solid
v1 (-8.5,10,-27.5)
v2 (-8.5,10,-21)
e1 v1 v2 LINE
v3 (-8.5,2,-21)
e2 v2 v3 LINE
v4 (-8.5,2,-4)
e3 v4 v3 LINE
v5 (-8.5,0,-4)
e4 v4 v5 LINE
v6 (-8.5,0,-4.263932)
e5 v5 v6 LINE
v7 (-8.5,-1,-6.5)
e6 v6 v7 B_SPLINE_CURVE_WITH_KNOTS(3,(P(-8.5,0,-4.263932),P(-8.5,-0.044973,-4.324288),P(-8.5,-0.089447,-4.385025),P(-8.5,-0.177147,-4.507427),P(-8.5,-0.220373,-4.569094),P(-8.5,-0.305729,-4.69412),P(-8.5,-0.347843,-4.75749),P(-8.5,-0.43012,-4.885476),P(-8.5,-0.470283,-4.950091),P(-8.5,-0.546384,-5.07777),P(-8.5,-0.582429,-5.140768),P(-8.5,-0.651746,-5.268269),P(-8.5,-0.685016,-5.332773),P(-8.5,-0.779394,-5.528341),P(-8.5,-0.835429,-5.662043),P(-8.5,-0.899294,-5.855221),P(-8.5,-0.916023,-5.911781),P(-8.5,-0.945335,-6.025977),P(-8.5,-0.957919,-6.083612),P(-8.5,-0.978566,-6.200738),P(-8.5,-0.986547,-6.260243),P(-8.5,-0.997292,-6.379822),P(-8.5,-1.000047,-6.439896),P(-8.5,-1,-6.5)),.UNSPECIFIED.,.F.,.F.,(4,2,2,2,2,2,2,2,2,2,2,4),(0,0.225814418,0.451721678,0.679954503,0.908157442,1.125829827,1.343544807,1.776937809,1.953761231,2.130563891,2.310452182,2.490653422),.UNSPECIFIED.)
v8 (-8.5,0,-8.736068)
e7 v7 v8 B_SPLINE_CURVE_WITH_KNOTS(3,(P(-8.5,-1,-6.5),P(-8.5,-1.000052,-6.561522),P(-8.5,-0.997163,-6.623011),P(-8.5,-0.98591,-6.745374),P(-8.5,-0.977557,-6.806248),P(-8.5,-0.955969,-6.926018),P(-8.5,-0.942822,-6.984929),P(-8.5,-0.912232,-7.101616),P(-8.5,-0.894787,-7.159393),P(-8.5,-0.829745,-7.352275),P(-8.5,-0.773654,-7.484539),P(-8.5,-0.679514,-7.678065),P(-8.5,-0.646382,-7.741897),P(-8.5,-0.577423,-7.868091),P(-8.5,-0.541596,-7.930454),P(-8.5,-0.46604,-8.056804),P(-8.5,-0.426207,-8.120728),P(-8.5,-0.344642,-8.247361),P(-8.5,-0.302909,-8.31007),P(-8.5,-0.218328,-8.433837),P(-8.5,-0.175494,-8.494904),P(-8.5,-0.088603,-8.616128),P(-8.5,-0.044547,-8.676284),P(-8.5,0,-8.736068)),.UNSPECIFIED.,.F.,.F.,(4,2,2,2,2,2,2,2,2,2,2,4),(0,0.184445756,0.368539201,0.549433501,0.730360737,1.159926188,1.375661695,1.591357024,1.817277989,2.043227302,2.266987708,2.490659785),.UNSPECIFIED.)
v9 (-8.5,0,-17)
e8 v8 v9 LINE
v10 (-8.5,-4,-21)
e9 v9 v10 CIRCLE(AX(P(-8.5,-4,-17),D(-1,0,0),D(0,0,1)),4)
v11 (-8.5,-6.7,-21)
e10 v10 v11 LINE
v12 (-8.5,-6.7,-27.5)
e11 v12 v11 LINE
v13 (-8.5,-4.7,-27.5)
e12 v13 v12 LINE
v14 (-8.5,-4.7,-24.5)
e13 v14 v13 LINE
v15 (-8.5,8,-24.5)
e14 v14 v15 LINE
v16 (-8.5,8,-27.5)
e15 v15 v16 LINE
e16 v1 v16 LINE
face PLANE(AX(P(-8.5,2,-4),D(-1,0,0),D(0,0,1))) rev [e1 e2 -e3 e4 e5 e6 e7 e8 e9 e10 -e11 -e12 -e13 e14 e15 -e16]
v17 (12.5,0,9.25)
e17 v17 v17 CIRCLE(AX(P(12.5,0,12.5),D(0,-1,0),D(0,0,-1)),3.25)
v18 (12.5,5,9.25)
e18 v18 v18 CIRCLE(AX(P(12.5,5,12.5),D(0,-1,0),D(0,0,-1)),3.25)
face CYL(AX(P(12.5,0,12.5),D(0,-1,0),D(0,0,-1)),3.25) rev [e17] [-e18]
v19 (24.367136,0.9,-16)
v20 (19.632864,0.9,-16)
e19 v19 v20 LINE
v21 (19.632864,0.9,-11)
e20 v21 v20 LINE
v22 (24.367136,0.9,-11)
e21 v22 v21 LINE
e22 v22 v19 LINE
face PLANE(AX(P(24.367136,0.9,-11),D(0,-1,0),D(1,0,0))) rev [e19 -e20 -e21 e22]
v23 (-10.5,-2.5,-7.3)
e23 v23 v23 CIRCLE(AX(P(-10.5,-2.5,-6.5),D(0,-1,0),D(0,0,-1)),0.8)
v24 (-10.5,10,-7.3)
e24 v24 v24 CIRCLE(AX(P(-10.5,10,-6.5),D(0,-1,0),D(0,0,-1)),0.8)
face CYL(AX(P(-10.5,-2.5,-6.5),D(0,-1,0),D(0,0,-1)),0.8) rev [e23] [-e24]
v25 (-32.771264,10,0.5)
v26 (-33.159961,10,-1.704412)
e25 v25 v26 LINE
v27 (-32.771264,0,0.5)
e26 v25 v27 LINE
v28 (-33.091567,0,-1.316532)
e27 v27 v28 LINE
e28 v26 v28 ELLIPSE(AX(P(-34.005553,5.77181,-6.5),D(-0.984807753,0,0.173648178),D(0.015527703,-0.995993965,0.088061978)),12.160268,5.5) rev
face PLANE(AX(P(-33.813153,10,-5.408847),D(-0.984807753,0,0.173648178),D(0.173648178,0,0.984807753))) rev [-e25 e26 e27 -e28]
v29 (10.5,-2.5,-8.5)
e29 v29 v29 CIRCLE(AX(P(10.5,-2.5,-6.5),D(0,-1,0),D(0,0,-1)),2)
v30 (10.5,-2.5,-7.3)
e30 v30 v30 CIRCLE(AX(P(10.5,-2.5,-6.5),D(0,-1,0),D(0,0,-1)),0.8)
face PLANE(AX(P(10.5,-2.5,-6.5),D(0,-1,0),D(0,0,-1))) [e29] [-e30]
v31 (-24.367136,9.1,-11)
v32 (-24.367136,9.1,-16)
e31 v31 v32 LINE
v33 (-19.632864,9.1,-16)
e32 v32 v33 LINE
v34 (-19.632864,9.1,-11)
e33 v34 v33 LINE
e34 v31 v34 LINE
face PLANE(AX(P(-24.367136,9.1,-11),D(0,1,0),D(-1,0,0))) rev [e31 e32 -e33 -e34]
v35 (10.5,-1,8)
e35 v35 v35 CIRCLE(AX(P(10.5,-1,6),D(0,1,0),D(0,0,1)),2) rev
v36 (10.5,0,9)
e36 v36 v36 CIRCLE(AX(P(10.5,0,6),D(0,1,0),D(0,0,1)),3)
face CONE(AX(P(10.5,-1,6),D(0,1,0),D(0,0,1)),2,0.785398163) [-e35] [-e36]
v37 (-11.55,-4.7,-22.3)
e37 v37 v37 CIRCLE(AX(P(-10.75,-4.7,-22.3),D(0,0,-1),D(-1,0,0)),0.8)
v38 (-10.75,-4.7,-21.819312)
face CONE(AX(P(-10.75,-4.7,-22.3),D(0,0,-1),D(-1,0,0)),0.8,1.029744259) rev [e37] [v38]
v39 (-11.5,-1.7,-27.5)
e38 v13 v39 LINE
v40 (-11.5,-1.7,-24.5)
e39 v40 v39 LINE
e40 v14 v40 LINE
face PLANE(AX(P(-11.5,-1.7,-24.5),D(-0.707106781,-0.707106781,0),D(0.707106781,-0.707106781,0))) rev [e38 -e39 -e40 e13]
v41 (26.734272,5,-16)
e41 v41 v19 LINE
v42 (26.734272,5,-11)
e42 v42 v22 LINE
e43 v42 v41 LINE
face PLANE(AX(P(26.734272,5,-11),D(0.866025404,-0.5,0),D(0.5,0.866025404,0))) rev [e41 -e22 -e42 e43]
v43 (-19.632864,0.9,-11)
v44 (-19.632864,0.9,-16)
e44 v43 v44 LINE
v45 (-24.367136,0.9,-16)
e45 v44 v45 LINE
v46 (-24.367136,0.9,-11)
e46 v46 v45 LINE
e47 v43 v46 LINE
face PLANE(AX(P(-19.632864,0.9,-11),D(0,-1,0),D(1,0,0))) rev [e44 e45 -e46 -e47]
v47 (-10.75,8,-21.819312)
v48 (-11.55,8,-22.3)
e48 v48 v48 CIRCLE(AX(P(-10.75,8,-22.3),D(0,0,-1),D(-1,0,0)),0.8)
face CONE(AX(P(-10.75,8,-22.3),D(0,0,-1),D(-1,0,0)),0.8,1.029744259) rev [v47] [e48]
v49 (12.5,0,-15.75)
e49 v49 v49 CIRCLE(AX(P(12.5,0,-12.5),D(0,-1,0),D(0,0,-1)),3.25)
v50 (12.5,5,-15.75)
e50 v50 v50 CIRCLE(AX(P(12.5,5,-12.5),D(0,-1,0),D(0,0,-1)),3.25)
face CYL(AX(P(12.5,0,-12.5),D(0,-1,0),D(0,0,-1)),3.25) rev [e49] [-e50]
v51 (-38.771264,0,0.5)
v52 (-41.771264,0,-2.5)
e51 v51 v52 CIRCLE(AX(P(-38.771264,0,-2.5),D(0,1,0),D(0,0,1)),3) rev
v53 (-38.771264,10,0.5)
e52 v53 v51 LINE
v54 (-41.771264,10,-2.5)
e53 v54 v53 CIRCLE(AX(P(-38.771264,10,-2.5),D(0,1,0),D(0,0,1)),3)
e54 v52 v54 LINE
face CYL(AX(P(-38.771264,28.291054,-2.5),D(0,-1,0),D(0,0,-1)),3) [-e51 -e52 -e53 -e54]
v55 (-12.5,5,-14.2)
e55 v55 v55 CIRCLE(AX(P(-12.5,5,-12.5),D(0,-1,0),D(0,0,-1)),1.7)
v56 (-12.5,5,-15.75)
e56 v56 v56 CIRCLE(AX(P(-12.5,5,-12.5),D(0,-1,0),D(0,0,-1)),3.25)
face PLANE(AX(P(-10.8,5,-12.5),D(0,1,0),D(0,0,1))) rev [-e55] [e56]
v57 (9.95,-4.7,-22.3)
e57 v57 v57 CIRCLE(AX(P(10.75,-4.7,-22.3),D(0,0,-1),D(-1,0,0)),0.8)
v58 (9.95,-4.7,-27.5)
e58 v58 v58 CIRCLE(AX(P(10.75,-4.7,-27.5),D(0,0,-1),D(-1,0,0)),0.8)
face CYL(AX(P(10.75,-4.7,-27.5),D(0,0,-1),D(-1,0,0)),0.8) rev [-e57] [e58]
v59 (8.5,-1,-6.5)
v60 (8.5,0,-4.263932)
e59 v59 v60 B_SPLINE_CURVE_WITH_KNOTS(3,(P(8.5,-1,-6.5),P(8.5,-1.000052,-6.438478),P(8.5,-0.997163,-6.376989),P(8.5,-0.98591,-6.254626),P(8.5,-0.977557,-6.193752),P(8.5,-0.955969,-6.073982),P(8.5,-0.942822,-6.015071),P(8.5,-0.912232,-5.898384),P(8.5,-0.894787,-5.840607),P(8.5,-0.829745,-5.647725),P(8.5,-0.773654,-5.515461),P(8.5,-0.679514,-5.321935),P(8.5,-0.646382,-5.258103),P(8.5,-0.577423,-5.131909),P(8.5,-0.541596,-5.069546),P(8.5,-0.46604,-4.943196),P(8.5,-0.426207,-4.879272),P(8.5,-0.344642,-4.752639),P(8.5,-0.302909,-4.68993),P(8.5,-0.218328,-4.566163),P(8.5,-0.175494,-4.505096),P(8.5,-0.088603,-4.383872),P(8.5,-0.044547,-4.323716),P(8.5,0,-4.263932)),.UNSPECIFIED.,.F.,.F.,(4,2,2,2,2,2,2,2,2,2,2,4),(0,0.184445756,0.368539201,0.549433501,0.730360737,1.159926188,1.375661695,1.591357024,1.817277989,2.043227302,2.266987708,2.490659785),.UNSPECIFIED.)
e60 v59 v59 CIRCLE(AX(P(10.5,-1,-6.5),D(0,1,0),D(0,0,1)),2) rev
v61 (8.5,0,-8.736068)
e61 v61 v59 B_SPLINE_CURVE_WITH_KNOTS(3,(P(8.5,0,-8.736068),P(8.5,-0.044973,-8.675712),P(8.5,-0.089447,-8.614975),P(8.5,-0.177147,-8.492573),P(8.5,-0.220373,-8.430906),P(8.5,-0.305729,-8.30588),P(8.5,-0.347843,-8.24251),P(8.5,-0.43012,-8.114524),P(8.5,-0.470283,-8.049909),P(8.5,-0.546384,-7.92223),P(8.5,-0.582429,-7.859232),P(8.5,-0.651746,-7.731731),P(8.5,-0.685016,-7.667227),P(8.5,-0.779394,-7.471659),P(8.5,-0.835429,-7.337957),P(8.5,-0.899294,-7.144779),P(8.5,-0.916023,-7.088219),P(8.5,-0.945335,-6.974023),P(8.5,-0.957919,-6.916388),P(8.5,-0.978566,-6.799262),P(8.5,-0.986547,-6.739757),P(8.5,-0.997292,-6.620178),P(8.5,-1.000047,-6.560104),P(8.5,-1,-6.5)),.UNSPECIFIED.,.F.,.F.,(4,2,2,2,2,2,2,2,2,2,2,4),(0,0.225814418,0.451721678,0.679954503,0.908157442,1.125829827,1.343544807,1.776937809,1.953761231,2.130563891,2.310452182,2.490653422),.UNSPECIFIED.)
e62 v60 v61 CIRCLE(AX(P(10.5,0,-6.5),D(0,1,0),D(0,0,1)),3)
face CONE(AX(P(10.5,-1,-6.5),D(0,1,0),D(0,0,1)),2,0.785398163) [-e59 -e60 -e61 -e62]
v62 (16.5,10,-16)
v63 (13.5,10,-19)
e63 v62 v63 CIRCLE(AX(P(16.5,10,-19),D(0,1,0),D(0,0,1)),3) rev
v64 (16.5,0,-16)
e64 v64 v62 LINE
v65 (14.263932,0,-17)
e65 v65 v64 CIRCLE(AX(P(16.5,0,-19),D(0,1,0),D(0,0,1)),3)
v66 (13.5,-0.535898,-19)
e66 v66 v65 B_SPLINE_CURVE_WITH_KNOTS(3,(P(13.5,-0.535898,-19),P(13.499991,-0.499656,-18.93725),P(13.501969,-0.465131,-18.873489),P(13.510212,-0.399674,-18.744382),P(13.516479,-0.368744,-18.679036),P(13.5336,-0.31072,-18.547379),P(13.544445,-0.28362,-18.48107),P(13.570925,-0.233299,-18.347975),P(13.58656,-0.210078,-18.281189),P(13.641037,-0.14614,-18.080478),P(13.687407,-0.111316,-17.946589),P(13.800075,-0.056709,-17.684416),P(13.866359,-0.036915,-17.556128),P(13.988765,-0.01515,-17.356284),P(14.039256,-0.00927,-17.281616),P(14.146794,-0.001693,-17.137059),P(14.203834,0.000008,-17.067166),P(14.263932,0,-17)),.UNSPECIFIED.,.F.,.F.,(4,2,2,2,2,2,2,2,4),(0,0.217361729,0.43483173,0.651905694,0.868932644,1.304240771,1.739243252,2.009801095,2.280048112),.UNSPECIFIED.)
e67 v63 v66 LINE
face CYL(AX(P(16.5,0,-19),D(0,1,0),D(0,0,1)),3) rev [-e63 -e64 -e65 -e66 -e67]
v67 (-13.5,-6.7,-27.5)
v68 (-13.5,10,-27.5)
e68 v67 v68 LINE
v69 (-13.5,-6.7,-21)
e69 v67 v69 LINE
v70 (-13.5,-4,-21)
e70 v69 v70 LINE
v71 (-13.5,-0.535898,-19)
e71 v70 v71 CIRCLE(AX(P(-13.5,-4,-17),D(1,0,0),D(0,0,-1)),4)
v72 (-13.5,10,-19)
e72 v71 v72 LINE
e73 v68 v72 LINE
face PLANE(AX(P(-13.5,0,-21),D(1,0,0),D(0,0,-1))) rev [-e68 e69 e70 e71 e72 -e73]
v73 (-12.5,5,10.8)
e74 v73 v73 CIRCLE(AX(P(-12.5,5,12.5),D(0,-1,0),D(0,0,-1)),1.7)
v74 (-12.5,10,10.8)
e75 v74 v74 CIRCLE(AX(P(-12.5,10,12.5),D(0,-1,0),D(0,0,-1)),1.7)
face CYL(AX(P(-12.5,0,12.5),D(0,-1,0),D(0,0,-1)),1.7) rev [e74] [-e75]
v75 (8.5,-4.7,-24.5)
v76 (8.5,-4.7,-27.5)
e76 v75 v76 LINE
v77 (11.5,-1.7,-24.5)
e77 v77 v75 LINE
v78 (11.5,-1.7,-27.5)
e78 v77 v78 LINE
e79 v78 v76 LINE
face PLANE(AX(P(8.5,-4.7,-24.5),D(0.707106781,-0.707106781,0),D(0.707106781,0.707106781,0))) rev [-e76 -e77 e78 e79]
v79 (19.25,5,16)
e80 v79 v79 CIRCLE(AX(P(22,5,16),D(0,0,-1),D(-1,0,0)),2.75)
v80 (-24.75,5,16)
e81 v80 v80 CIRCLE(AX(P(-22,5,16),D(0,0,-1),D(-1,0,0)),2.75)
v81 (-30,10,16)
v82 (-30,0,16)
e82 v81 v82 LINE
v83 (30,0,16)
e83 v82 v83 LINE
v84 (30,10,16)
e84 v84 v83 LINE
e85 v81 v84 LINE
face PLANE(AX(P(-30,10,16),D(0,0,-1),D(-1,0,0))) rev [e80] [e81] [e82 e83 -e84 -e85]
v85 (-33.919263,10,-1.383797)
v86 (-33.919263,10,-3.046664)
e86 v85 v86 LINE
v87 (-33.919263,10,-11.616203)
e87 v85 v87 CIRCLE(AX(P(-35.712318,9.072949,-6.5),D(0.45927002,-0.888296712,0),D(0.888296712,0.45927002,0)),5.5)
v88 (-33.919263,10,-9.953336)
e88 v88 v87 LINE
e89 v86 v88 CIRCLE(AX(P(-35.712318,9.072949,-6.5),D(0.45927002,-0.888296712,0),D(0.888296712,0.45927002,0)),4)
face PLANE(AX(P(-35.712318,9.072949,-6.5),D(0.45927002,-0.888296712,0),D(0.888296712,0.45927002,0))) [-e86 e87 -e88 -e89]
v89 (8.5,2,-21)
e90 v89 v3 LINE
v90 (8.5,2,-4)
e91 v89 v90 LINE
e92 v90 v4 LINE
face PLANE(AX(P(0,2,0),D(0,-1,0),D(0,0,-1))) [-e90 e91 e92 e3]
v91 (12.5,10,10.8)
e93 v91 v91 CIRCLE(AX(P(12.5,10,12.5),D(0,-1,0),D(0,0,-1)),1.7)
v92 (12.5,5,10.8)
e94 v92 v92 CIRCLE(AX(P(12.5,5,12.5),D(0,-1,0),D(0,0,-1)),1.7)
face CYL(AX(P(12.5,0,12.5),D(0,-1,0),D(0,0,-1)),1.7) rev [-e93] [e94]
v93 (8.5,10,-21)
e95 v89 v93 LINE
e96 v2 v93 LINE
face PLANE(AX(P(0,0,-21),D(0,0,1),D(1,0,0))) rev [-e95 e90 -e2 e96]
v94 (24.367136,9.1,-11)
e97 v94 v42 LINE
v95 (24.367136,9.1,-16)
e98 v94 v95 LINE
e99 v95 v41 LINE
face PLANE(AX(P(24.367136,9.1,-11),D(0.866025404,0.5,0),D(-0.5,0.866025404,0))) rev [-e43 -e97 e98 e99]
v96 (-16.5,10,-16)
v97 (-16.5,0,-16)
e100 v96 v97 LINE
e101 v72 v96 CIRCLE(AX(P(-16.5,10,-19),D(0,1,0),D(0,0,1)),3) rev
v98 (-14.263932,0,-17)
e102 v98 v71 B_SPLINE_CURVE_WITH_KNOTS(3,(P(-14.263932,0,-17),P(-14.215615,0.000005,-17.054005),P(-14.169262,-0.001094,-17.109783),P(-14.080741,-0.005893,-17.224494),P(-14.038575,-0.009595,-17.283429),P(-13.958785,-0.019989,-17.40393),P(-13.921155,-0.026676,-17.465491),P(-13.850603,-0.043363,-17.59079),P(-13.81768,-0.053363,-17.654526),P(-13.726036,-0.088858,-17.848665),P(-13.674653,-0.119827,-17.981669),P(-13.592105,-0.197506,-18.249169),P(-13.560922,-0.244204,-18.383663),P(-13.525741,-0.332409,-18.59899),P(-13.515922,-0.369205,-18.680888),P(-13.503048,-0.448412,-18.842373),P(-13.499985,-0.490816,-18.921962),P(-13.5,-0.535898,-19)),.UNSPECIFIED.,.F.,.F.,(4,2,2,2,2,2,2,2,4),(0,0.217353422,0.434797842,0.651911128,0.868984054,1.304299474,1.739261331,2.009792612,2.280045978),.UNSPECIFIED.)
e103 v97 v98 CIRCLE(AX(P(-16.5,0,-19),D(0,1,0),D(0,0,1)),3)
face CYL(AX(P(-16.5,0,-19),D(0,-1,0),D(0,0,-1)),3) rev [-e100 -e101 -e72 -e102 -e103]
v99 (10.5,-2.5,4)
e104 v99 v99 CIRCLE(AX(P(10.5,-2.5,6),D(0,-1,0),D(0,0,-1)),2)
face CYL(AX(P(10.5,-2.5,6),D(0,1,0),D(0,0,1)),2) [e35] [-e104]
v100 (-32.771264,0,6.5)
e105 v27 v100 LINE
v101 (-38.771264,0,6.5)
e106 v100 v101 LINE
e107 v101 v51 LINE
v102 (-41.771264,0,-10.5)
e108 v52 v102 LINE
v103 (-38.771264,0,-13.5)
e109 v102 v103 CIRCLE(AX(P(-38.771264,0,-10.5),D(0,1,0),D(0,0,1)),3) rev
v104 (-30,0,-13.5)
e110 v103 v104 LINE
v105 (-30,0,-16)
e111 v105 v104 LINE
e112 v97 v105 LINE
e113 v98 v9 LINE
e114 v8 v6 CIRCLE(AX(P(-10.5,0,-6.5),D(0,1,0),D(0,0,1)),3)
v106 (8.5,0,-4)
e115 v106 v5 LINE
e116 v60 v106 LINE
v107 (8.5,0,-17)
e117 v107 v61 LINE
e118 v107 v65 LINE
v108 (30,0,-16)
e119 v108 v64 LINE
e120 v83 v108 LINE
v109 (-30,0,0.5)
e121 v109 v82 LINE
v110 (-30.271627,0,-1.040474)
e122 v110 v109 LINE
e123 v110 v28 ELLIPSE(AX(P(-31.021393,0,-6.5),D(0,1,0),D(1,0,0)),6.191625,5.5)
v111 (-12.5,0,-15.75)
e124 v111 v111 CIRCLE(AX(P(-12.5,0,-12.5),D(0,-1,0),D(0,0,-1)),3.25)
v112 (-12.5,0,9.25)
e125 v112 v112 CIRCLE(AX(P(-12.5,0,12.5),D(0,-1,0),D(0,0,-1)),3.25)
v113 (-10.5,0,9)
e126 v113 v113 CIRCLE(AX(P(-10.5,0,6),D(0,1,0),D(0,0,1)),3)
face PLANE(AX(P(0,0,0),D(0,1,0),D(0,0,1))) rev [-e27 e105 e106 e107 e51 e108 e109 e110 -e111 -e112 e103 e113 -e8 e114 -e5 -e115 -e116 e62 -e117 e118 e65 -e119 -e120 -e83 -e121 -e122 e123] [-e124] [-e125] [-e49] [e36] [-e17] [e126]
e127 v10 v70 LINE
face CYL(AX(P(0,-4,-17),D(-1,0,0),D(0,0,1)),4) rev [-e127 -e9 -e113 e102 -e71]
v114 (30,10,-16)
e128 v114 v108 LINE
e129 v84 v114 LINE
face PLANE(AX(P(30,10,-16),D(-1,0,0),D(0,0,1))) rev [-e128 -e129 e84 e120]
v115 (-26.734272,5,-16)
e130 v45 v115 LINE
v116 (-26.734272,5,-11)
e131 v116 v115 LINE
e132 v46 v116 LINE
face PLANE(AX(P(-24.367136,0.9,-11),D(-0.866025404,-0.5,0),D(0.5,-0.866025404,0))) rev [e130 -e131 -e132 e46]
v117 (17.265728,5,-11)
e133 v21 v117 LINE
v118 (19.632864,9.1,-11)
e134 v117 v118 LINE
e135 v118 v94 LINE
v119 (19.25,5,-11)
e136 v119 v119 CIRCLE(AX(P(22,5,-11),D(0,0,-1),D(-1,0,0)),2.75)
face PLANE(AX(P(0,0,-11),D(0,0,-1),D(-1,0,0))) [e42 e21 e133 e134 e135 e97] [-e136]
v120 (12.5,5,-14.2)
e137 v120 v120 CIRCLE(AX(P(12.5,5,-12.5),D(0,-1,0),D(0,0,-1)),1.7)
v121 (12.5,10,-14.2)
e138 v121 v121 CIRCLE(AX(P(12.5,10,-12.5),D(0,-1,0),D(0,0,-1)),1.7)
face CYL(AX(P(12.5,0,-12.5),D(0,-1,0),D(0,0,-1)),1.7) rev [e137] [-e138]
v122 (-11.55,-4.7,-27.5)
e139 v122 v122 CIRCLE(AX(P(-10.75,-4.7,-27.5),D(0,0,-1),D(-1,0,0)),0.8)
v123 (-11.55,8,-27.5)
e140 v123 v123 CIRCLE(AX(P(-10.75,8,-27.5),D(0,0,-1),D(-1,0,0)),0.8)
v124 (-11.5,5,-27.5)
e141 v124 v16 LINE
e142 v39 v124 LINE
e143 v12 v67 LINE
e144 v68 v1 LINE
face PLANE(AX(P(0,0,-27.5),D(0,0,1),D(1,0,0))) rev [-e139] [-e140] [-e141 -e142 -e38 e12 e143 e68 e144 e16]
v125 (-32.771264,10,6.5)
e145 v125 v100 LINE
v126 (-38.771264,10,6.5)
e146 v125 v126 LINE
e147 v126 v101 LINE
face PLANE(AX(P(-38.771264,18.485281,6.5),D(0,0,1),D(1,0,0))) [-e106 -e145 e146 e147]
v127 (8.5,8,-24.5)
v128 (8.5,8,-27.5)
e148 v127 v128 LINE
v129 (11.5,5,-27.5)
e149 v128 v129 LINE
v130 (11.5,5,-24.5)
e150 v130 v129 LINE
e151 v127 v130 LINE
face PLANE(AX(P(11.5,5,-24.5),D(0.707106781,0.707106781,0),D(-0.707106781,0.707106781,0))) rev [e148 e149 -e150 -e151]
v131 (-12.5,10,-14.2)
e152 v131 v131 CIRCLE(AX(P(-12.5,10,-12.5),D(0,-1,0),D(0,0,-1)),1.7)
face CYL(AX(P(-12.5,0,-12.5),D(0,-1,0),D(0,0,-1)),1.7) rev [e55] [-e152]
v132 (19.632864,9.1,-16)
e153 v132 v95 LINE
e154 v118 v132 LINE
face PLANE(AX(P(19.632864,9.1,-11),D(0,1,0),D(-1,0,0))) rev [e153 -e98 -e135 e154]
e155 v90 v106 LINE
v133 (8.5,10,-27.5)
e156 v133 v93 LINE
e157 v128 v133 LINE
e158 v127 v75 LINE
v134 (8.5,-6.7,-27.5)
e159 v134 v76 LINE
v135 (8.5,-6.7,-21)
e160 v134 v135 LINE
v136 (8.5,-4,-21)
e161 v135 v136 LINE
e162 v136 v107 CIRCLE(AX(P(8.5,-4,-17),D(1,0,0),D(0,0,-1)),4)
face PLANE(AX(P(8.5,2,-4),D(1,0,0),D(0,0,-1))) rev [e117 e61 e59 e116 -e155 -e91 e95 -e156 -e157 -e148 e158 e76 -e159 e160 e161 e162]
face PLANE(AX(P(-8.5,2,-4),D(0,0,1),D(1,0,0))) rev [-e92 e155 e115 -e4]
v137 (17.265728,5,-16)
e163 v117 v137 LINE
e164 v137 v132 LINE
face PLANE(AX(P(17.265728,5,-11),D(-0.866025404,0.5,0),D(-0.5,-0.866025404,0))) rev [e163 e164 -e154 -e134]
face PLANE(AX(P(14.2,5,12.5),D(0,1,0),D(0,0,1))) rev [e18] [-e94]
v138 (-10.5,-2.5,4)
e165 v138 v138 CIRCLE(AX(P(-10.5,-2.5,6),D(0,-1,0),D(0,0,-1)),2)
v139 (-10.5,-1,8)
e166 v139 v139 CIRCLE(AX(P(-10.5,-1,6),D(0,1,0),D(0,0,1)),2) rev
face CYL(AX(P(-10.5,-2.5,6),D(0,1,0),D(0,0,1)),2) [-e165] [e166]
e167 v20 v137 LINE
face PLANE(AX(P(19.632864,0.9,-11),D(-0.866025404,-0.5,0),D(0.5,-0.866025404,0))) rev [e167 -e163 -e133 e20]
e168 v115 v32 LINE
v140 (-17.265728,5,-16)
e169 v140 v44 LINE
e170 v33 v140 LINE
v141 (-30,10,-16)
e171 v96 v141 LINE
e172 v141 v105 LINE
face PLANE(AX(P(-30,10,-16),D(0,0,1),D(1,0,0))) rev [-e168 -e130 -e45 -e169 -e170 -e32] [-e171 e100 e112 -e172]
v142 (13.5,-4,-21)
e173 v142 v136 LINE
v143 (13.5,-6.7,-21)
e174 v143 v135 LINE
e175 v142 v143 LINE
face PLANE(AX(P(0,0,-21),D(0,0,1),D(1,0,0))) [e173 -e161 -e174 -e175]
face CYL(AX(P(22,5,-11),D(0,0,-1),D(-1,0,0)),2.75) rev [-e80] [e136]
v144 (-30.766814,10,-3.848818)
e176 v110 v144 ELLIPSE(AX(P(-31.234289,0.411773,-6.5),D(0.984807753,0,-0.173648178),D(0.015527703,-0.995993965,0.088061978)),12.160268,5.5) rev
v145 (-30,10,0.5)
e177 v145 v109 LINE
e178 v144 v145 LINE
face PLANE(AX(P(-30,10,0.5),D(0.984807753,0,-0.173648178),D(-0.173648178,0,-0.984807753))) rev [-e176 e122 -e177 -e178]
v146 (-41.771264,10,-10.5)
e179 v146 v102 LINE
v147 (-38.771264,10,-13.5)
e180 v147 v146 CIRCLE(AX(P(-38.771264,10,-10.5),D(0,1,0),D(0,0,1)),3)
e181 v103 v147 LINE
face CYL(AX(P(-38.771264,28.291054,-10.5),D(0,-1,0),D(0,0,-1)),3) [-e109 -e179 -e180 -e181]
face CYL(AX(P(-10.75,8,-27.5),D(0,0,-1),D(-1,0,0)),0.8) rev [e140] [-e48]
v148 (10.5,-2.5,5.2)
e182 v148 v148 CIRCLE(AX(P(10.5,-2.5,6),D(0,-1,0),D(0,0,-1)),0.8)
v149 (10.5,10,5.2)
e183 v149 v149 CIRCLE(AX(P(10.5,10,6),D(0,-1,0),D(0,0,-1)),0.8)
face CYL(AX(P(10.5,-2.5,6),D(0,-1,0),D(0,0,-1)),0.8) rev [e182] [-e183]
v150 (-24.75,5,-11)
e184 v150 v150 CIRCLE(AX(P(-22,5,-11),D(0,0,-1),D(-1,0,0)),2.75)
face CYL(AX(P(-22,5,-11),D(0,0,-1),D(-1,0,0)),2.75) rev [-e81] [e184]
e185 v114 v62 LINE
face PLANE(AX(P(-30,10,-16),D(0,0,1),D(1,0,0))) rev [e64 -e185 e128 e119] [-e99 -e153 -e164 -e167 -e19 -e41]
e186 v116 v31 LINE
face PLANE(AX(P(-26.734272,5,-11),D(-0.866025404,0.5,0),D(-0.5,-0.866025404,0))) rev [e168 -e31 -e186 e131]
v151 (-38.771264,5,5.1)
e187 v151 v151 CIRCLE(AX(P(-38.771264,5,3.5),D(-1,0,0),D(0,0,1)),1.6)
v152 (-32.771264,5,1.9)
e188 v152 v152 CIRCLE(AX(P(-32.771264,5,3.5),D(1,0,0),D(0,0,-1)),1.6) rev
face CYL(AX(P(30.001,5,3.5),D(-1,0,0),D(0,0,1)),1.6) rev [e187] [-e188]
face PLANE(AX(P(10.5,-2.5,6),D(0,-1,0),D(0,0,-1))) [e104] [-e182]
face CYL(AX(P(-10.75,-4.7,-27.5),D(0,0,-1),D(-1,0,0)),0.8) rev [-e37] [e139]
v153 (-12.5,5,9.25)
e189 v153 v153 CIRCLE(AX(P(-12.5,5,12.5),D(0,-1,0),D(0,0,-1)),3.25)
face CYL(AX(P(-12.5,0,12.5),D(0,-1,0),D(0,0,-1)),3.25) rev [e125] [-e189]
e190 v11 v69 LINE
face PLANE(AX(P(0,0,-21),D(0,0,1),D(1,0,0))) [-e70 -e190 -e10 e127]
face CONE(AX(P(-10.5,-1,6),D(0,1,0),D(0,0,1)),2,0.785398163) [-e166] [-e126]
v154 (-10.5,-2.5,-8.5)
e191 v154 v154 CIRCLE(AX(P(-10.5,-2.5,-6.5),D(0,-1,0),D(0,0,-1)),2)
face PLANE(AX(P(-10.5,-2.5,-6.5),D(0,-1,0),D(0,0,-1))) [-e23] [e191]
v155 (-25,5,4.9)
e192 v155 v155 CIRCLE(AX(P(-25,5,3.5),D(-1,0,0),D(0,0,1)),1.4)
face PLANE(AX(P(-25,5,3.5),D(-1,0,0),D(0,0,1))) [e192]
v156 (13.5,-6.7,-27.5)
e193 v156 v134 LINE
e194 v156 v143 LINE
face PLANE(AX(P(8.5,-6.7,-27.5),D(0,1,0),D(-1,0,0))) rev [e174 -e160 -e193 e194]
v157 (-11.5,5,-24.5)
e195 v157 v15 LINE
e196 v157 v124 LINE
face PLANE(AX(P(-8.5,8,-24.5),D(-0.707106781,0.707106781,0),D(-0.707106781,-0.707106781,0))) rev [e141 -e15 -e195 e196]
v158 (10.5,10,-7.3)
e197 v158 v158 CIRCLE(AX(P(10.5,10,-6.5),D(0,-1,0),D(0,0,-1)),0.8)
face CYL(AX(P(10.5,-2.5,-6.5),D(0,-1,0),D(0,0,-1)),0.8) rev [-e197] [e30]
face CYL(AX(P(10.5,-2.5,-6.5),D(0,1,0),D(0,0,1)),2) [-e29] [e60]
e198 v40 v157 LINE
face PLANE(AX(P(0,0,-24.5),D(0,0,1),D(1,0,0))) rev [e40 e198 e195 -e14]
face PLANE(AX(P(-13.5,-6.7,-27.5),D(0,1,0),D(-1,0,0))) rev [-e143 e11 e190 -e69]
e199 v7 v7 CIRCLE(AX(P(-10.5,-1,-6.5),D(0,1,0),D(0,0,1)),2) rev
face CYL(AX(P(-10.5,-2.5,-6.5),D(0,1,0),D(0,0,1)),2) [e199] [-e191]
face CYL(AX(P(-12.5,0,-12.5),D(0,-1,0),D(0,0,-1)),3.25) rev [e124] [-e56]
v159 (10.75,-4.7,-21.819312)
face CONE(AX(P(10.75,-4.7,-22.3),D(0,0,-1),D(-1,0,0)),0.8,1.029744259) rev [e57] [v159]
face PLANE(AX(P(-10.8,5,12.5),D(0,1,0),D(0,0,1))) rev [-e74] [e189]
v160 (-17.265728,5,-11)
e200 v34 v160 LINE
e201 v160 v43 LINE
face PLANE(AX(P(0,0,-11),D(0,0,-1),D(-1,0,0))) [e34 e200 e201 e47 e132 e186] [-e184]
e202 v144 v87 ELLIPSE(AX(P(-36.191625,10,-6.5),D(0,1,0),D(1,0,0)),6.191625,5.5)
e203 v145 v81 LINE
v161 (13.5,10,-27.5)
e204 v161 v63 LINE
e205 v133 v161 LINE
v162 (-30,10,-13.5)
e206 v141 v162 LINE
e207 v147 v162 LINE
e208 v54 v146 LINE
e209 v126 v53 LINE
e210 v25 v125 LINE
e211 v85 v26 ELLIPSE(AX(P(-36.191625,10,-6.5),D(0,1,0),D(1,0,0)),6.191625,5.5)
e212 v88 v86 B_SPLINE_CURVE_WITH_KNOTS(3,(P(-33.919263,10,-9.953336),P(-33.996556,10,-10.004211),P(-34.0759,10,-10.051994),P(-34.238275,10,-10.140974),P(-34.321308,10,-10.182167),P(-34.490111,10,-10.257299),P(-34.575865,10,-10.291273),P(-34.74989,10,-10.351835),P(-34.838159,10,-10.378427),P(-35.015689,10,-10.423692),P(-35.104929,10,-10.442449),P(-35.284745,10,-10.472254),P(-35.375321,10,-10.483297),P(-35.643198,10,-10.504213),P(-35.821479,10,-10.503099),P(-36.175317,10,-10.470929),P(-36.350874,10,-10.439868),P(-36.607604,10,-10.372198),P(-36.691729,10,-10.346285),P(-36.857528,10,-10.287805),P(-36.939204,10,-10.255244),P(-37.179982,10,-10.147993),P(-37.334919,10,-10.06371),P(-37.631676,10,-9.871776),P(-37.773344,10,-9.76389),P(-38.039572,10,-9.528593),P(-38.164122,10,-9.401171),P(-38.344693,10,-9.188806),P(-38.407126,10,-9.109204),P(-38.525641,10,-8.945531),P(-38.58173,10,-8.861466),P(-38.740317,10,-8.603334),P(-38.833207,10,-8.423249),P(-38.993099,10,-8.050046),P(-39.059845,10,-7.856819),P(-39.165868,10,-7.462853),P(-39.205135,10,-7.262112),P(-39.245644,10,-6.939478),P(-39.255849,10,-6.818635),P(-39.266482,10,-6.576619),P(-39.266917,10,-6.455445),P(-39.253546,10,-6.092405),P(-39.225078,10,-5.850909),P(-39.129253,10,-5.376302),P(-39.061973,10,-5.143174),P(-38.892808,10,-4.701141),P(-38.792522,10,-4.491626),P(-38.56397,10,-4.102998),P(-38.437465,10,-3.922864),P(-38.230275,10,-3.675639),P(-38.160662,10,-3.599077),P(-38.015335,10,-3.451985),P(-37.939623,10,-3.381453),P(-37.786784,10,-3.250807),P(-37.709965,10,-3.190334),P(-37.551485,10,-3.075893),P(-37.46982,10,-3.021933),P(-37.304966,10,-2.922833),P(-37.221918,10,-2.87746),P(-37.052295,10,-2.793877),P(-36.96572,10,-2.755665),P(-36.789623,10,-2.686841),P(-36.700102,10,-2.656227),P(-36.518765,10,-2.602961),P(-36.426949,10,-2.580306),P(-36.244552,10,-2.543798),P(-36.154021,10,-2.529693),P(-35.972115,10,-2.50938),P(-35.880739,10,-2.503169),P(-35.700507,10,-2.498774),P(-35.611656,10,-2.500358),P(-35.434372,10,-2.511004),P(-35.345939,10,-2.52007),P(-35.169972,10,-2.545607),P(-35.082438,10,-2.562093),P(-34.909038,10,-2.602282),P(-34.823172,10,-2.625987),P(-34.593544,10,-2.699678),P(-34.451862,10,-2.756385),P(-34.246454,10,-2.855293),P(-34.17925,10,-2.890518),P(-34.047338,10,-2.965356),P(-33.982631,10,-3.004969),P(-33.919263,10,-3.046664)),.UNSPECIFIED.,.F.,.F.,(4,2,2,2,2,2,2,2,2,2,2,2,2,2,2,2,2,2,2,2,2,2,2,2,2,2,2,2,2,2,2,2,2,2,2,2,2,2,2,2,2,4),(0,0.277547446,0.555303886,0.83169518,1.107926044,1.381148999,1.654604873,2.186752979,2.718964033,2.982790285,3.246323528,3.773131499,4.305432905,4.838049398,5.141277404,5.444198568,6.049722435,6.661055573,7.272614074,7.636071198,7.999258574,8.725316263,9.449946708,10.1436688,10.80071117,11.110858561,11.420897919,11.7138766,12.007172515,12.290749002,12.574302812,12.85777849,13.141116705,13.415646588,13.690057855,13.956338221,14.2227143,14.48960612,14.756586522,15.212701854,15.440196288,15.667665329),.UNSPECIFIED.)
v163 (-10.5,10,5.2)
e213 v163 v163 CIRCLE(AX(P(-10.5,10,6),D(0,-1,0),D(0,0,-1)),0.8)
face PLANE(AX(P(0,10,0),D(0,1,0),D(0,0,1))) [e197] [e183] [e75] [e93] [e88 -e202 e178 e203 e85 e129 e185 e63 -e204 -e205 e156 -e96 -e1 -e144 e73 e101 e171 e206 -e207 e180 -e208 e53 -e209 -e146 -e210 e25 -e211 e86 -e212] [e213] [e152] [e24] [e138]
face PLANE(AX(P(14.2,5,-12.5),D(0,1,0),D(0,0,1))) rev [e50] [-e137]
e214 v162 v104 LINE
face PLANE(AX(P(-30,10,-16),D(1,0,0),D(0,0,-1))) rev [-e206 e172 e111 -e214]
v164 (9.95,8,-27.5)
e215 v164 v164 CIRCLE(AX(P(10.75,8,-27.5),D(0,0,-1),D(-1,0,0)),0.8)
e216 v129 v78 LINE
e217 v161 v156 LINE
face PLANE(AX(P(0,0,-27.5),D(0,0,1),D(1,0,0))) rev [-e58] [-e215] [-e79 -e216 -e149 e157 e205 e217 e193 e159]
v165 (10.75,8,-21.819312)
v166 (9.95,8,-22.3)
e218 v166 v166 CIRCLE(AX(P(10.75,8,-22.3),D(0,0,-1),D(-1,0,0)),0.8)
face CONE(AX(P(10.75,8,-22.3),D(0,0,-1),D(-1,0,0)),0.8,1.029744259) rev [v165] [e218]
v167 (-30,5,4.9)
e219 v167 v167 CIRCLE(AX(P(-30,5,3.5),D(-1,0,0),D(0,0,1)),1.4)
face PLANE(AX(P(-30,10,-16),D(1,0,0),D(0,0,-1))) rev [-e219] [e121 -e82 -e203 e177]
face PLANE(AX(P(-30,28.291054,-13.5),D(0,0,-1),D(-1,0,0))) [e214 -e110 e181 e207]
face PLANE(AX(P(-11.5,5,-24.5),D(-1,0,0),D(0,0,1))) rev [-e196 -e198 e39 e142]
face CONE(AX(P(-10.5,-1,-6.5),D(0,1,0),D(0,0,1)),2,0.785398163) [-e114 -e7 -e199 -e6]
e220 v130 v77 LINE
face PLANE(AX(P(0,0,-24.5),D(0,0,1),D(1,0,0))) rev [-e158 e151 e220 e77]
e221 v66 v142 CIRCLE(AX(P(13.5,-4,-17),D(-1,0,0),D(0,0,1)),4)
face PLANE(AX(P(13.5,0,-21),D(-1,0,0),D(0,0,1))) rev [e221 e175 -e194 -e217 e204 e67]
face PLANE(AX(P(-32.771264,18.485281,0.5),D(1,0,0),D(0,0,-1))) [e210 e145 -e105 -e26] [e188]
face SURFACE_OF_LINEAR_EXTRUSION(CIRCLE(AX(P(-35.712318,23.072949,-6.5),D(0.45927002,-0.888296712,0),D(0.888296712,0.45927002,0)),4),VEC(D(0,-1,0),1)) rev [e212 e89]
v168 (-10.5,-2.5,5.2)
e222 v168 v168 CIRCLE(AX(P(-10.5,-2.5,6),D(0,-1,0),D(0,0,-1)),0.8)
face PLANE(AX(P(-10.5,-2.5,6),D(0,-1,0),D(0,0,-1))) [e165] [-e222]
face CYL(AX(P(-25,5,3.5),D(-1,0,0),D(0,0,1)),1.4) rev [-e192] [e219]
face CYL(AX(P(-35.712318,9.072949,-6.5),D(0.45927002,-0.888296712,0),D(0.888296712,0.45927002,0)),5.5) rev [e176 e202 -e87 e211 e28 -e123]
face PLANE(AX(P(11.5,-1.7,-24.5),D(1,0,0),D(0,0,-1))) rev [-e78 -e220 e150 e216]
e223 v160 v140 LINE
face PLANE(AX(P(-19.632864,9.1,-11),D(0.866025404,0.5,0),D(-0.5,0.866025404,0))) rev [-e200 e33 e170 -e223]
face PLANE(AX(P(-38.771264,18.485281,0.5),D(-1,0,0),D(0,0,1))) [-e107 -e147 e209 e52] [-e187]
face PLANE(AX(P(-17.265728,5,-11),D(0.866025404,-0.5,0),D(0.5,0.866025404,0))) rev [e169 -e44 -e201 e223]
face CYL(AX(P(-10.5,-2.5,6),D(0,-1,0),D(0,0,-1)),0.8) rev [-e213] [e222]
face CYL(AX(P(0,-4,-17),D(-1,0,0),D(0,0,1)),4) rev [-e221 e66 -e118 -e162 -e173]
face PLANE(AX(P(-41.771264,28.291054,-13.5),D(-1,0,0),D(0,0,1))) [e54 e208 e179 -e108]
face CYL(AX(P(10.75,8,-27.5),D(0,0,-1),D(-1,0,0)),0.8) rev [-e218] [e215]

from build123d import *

# Parameters (mm, degrees)
SKETCH2_W                      = 60
SKETCH2_H                      = 32
BOSS_EXTRUDE1_DEPTH            = 10
CBORE_FOR_M3_SHCS1_D           = 3.4
CBORE_FOR_M3_SHCS1_CBORE_D     = 6.5
CBORE_FOR_M3_SHCS1_CBORE_DEPTH = 5
SKETCH6_W                      = 17
SKETCH6_H                      = 12
CUT_EXTRUDE2_DEPTH             = 2
CUT_EXTRUDE4_DEPTH             = 5
M5_CLEARANCE_HOLE1_D           = 5.5
SKETCH12_R                     = 2
BOSS_EXTRUDE2_DEPTH            = 2.5
M2X0_4_TAPPED_HOLE1_D          = 1.6
BOSS_EXTRUDE3_DEPTH            = 5
BOSS_EXTRUDE4_DEPTH            = 6.5
FILLET1_R                      = 4
M2X0_4_TAPPED_HOLE2_D          = 1.6
M2X0_4_TAPPED_HOLE2_DEPTH      = 5.2
M2X0_4_TAPPED_HOLE2_TIP        = 0.480688495
CUT_EXTRUDE5_DEPTH             = 3
CHAMFER1_SIZE                  = 1
BOSS_EXTRUDE5_DEPTH            = 10
SKETCH26_R                     = 5.5
CUT_EXTRUDE7_DEPTH             = 14
SKETCH27_R                     = 4
CUT_EXTRUDE8_DEPTH             = 14
FILLET2_R                      = 3
SKETCH28_W                     = 6
SKETCH28_H                     = 6
BOSS_EXTRUDE6_DEPTH            = 10
CUT_EXTRUDE9_DEPTH             = 52.000867623
CUT_EXTRUDE10_REACH            = 76.738
SKETCH30_R                     = 1.6
SKETCH31_R                     = 1.4
CUT_EXTRUDE11_DEPTH            = 5


with BuildPart() as part:
    # Sketch2 → Boss-Extrude1 (new body)
    with BuildSketch(Plane(origin=(0, 0, 0), x_dir=(1, 0, 0), z_dir=(0, 1, 0))):
        Rectangle(SKETCH2_W, SKETCH2_H)
    extrude(amount=BOSS_EXTRUDE1_DEPTH)

    # CBORE for M3 SHCS1 (through all)
    with Locations(Plane(origin=(0, 0, 0), x_dir=(-1, 0, 0), z_dir=(0, -1, 0))):
        with Locations((12.5, 12.5), (12.5, -12.5), (-12.5, -12.5), (-12.5, 12.5)):
            CounterBoreHole(CBORE_FOR_M3_SHCS1_D / 2, CBORE_FOR_M3_SHCS1_CBORE_D / 2, CBORE_FOR_M3_SHCS1_CBORE_DEPTH)

    # Sketch6 → Cut-Extrude2 (cut)
    with BuildSketch(Plane(origin=(0, 0, 0), x_dir=(-1, 0, 0), z_dir=(0, -1, 0))):
        with Locations((0, 10)):
            Rectangle(SKETCH6_W, SKETCH6_H)
    extrude(amount=-CUT_EXTRUDE2_DEPTH, mode=Mode.SUBTRACT)

    # Sketch8 → Cut-Extrude4 (cut)
    with BuildSketch(Plane(origin=(0, 0, -16), x_dir=(-1, 0, 0), z_dir=(0, 0, -1))):
        Polygon((17.265727793, 5), (19.632863896, 0.9), (24.367136104, 0.9), (26.734272207, 5), (24.367136104, 9.1), (19.632863896, 9.1), align=None)
        Polygon((-17.265727793, 5), (-19.632863896, 9.1), (-24.367136104, 9.1), (-26.734272207, 5), (-24.367136104, 0.9), (-19.632863896, 0.9), align=None)
    extrude(amount=-CUT_EXTRUDE4_DEPTH, mode=Mode.SUBTRACT)

    # M5 Clearance Hole1 (through all)
    with Locations(Plane(origin=(0, 0, -11), x_dir=(-1, 0, 0), z_dir=(0, 0, -1))):
        with Locations((22, 5), (-22, 5)):
            Hole(M5_CLEARANCE_HOLE1_D / 2)

    # Sketch12 → Boss-Extrude2 (add)
    with BuildSketch(Plane.XZ):
        with Locations(Location((10.5, -6.5, 0), (0, 0, 180))):
            Circle(SKETCH12_R)
        with Locations((-10.5, -6.5)):
            Circle(SKETCH12_R)
        with Locations(Location((10.5, 6, 0), (0, 0, 90))):
            Circle(SKETCH12_R)
        with Locations(Location((-10.5, 6, 0), (0, 0, 90))):
            Circle(SKETCH12_R)
    extrude(amount=BOSS_EXTRUDE2_DEPTH)

    # M2x0.4 Tapped Hole1 (through all)
    with Locations(Plane(origin=(0, -2.5, 0), x_dir=(-1, 0, 0), z_dir=(0, -1, 0))):
        with Locations((-10.5, -6), (-10.5, 6.5), (10.5, -6), (10.5, 6.5)):
            Hole(M2X0_4_TAPPED_HOLE1_D / 2)

    # Sketch15 → Boss-Extrude3 (add)
    with BuildSketch(Plane(origin=(0, 0, -16), x_dir=(-1, 0, 0), z_dir=(0, 0, -1))):
        Polygon((-13.5, 0), (-13.5, 10), (13.5, 10), (13.5, 0), (8.5, 0), (8.5, 2), (-8.5, 2), (-8.5, 0), align=None)
    extrude(amount=BOSS_EXTRUDE3_DEPTH)

    # Sketch19 → Boss-Extrude4 (add)
    with BuildSketch(Plane(origin=(0, 0, -21), x_dir=(-1, 0, 0), z_dir=(0, 0, -1))):
        Polygon((13.5, 0), (13.5, -6.7), (8.5, -6.7), (8.5, 0), (8.5, 10), (13.5, 10), align=None)
        Polygon((-8.5, 0), (-8.5, 10), (-13.5, 10), (-13.5, 0), (-13.5, -6.7), (-8.5, -6.7), align=None)
    extrude(amount=BOSS_EXTRUDE4_DEPTH)

    # Fillet1
    fillet1_edges = [part.edges().sort_by_distance(p)[0] for p in [
        (-11, 0, -21),
        (11, 0, -21),
    ]]
    fillet(fillet1_edges, radius=FILLET1_R)

    # M2x0.4 Tapped Hole2
    with Locations(Plane(origin=(0, 0, -27.5), x_dir=(-1, 0, 0), z_dir=(0, 0, -1))):
        with Locations((10.75, -4.7), (-10.75, -4.7), (-10.75, 8), (10.75, 8)):
            Hole(M2X0_4_TAPPED_HOLE2_D / 2, depth=M2X0_4_TAPPED_HOLE2_DEPTH)
            with Locations((0, 0, -(M2X0_4_TAPPED_HOLE2_DEPTH + M2X0_4_TAPPED_HOLE2_TIP / 2))):  # 118° drill point
                Cone(0, M2X0_4_TAPPED_HOLE2_D / 2, M2X0_4_TAPPED_HOLE2_TIP, mode=Mode.SUBTRACT)

    # Sketch23 → Cut-Extrude5 (cut)
    with BuildSketch(Plane(origin=(0, 0, -27.5), x_dir=(-1, 0, 0), z_dir=(0, 0, -1))):
        Polygon((8.5, 8), (11.5, 5), (11.5, -1.7), (8.5, -4.7), (-8.5, -4.7), (-11.5, -1.7), (-11.5, 5), (-8.5, 8), align=None)
    extrude(amount=-CUT_EXTRUDE5_DEPTH, mode=Mode.SUBTRACT)

    # Chamfer1
    # the kernel refuses this chamfer: 1 mm, written as the material it adds along each edge
    with BuildSketch(Plane(origin=(10.5, 0, 6), x_dir=(0, 0, 1), z_dir=(1, 0, 0))) as chamfer1_piece_1:
        Polygon((2 + CHAMFER1_SIZE, 0), (2, CHAMFER1_SIZE), (2, 0), align=None)
    revolve(axis=Axis((10.5, 0, 6), (0, -1, 0)))
    with BuildSketch(Plane(origin=(-10.5, 0, -6.5), x_dir=(1, 0, 0), z_dir=(0, 0, -1))) as chamfer1_piece_2_section:
        Polygon((2 + CHAMFER1_SIZE, 0), (2, CHAMFER1_SIZE), (2, 0), align=None)
    chamfer1_piece_2 = revolve(axis=Axis((-10.5, 0, -6.5), (0, -1, 0)), mode=Mode.PRIVATE)
    chamfer1_piece_2 = split(chamfer1_piece_2, bisect_by=Plane(origin=(-8.5, -0.487052851, -6.5), z_dir=(-1, 0, 0)), keep=Keep.TOP, mode=Mode.PRIVATE)
    add(chamfer1_piece_2)
    with BuildSketch(Plane(origin=(-10.5, 0, 6), x_dir=(0, 0, 1), z_dir=(1, 0, 0))) as chamfer1_piece_3:
        Polygon((2 + CHAMFER1_SIZE, 0), (2, CHAMFER1_SIZE), (2, 0), align=None)
    revolve(axis=Axis((-10.5, 0, 6), (0, -1, 0)))
    with BuildSketch(Plane(origin=(10.5, 0, -6.5), x_dir=(-1, 0, 0), z_dir=(0, 0, 1))) as chamfer1_piece_4_section:
        Polygon((2 + CHAMFER1_SIZE, 0), (2, CHAMFER1_SIZE), (2, 0), align=None)
    chamfer1_piece_4 = revolve(axis=Axis((10.5, 0, -6.5), (0, -1, 0)), mode=Mode.PRIVATE)
    chamfer1_piece_4 = split(chamfer1_piece_4, bisect_by=Plane(origin=(8.5, -0.487052851, -6.5), z_dir=(1, 0, 0)), keep=Keep.TOP, mode=Mode.PRIVATE)
    add(chamfer1_piece_4)

    # Sketch25 → Boss-Extrude5 (add)
    with BuildSketch(Plane.XZ):
        Polygon((-30, 0.5), (-30, -6.5), (-30, -13.5), (-41.771263836, -13.5), (-41.771263836, 0.5), align=None)
    extrude(amount=-BOSS_EXTRUDE5_DEPTH)

    # Sketch26 → Cut-Extrude7 (cut)
    with BuildSketch(Plane(origin=(-34.168169597, -5.889190106, 16), x_dir=(-0.888296712324418, -0.45927001956760705, 0), z_dir=(0.45927001956760705, -0.888296712324418, 0))):
        with Locations(Location((-5.5, 22.5, 0), (0, 0, 180))):
            Circle(SKETCH26_R)
    extrude(amount=-CUT_EXTRUDE7_DEPTH, mode=Mode.SUBTRACT)

    # Sketch27 → Cut-Extrude8 (cut, along a direction that is not the sketch's normal)
    with BuildSketch(Plane(origin=(-11.234235046, 21.728686027, 0), x_dir=(0.888296712324418, 0.45927001956760705, 0), z_dir=(0.45927001956760705, -0.888296712324418, 0))):
        with Locations((-27.556201174, -6.5)):
            Circle(SKETCH27_R)
    extrude(amount=-CUT_EXTRUDE8_DEPTH, dir=(0, -1, 0), mode=Mode.SUBTRACT)

    # Fillet2
    fillet2_edges = [part.edges().sort_by_distance(p)[0] for p in [
        (-13.5, 5, -16),
        (13.5, 5, -16),
        (-41.771263836, 5, 0.5),
        (-41.771263836, 5, -13.5),
    ]]
    fillet(fillet2_edges, radius=FILLET2_R)

    # Sketch28 → Boss-Extrude6 (add)
    with BuildSketch(Plane.XZ):
        with Locations((-35.771263836, 3.5)):
            Rectangle(SKETCH28_W, SKETCH28_H)
    extrude(amount=-BOSS_EXTRUDE6_DEPTH)

    # Sketch29 → Cut-Extrude9 (cut, through all)
    with BuildSketch(Plane.XZ):
        Polygon((-30, 0.5), (-31.125452896, -5.882760545), (-33.813152902, -5.408846518), (-32.771263836, 0.5), align=None)
    extrude(amount=-CUT_EXTRUDE9_DEPTH, mode=Mode.SUBTRACT)

    # Sketch30 → Cut-Extrude10 (cut, up to next)
    with BuildSketch(Plane.ZY.offset(38.771263836), mode=Mode.PRIVATE) as cut_extrude10_sk1:
        with Locations((3.5, 5)):
            Circle(SKETCH30_R)
    cut_extrude10_tool1 = extrude(cut_extrude10_sk1.sketch, amount=-CUT_EXTRUDE10_REACH, mode=Mode.PRIVATE) & part.part
    add(cut_extrude10_tool1.solids().sort_by_distance((-38.771264, 5, 3.5))[0], mode=Mode.SUBTRACT)

    # Sketch31 → Cut-Extrude11 (cut)
    with BuildSketch(Plane.ZY.offset(30)):
        with Locations((3.5, 5)):
            Circle(SKETCH31_R)
    extrude(amount=-CUT_EXTRUDE11_DEPTH, mode=Mode.SUBTRACT)


solid = part.part
